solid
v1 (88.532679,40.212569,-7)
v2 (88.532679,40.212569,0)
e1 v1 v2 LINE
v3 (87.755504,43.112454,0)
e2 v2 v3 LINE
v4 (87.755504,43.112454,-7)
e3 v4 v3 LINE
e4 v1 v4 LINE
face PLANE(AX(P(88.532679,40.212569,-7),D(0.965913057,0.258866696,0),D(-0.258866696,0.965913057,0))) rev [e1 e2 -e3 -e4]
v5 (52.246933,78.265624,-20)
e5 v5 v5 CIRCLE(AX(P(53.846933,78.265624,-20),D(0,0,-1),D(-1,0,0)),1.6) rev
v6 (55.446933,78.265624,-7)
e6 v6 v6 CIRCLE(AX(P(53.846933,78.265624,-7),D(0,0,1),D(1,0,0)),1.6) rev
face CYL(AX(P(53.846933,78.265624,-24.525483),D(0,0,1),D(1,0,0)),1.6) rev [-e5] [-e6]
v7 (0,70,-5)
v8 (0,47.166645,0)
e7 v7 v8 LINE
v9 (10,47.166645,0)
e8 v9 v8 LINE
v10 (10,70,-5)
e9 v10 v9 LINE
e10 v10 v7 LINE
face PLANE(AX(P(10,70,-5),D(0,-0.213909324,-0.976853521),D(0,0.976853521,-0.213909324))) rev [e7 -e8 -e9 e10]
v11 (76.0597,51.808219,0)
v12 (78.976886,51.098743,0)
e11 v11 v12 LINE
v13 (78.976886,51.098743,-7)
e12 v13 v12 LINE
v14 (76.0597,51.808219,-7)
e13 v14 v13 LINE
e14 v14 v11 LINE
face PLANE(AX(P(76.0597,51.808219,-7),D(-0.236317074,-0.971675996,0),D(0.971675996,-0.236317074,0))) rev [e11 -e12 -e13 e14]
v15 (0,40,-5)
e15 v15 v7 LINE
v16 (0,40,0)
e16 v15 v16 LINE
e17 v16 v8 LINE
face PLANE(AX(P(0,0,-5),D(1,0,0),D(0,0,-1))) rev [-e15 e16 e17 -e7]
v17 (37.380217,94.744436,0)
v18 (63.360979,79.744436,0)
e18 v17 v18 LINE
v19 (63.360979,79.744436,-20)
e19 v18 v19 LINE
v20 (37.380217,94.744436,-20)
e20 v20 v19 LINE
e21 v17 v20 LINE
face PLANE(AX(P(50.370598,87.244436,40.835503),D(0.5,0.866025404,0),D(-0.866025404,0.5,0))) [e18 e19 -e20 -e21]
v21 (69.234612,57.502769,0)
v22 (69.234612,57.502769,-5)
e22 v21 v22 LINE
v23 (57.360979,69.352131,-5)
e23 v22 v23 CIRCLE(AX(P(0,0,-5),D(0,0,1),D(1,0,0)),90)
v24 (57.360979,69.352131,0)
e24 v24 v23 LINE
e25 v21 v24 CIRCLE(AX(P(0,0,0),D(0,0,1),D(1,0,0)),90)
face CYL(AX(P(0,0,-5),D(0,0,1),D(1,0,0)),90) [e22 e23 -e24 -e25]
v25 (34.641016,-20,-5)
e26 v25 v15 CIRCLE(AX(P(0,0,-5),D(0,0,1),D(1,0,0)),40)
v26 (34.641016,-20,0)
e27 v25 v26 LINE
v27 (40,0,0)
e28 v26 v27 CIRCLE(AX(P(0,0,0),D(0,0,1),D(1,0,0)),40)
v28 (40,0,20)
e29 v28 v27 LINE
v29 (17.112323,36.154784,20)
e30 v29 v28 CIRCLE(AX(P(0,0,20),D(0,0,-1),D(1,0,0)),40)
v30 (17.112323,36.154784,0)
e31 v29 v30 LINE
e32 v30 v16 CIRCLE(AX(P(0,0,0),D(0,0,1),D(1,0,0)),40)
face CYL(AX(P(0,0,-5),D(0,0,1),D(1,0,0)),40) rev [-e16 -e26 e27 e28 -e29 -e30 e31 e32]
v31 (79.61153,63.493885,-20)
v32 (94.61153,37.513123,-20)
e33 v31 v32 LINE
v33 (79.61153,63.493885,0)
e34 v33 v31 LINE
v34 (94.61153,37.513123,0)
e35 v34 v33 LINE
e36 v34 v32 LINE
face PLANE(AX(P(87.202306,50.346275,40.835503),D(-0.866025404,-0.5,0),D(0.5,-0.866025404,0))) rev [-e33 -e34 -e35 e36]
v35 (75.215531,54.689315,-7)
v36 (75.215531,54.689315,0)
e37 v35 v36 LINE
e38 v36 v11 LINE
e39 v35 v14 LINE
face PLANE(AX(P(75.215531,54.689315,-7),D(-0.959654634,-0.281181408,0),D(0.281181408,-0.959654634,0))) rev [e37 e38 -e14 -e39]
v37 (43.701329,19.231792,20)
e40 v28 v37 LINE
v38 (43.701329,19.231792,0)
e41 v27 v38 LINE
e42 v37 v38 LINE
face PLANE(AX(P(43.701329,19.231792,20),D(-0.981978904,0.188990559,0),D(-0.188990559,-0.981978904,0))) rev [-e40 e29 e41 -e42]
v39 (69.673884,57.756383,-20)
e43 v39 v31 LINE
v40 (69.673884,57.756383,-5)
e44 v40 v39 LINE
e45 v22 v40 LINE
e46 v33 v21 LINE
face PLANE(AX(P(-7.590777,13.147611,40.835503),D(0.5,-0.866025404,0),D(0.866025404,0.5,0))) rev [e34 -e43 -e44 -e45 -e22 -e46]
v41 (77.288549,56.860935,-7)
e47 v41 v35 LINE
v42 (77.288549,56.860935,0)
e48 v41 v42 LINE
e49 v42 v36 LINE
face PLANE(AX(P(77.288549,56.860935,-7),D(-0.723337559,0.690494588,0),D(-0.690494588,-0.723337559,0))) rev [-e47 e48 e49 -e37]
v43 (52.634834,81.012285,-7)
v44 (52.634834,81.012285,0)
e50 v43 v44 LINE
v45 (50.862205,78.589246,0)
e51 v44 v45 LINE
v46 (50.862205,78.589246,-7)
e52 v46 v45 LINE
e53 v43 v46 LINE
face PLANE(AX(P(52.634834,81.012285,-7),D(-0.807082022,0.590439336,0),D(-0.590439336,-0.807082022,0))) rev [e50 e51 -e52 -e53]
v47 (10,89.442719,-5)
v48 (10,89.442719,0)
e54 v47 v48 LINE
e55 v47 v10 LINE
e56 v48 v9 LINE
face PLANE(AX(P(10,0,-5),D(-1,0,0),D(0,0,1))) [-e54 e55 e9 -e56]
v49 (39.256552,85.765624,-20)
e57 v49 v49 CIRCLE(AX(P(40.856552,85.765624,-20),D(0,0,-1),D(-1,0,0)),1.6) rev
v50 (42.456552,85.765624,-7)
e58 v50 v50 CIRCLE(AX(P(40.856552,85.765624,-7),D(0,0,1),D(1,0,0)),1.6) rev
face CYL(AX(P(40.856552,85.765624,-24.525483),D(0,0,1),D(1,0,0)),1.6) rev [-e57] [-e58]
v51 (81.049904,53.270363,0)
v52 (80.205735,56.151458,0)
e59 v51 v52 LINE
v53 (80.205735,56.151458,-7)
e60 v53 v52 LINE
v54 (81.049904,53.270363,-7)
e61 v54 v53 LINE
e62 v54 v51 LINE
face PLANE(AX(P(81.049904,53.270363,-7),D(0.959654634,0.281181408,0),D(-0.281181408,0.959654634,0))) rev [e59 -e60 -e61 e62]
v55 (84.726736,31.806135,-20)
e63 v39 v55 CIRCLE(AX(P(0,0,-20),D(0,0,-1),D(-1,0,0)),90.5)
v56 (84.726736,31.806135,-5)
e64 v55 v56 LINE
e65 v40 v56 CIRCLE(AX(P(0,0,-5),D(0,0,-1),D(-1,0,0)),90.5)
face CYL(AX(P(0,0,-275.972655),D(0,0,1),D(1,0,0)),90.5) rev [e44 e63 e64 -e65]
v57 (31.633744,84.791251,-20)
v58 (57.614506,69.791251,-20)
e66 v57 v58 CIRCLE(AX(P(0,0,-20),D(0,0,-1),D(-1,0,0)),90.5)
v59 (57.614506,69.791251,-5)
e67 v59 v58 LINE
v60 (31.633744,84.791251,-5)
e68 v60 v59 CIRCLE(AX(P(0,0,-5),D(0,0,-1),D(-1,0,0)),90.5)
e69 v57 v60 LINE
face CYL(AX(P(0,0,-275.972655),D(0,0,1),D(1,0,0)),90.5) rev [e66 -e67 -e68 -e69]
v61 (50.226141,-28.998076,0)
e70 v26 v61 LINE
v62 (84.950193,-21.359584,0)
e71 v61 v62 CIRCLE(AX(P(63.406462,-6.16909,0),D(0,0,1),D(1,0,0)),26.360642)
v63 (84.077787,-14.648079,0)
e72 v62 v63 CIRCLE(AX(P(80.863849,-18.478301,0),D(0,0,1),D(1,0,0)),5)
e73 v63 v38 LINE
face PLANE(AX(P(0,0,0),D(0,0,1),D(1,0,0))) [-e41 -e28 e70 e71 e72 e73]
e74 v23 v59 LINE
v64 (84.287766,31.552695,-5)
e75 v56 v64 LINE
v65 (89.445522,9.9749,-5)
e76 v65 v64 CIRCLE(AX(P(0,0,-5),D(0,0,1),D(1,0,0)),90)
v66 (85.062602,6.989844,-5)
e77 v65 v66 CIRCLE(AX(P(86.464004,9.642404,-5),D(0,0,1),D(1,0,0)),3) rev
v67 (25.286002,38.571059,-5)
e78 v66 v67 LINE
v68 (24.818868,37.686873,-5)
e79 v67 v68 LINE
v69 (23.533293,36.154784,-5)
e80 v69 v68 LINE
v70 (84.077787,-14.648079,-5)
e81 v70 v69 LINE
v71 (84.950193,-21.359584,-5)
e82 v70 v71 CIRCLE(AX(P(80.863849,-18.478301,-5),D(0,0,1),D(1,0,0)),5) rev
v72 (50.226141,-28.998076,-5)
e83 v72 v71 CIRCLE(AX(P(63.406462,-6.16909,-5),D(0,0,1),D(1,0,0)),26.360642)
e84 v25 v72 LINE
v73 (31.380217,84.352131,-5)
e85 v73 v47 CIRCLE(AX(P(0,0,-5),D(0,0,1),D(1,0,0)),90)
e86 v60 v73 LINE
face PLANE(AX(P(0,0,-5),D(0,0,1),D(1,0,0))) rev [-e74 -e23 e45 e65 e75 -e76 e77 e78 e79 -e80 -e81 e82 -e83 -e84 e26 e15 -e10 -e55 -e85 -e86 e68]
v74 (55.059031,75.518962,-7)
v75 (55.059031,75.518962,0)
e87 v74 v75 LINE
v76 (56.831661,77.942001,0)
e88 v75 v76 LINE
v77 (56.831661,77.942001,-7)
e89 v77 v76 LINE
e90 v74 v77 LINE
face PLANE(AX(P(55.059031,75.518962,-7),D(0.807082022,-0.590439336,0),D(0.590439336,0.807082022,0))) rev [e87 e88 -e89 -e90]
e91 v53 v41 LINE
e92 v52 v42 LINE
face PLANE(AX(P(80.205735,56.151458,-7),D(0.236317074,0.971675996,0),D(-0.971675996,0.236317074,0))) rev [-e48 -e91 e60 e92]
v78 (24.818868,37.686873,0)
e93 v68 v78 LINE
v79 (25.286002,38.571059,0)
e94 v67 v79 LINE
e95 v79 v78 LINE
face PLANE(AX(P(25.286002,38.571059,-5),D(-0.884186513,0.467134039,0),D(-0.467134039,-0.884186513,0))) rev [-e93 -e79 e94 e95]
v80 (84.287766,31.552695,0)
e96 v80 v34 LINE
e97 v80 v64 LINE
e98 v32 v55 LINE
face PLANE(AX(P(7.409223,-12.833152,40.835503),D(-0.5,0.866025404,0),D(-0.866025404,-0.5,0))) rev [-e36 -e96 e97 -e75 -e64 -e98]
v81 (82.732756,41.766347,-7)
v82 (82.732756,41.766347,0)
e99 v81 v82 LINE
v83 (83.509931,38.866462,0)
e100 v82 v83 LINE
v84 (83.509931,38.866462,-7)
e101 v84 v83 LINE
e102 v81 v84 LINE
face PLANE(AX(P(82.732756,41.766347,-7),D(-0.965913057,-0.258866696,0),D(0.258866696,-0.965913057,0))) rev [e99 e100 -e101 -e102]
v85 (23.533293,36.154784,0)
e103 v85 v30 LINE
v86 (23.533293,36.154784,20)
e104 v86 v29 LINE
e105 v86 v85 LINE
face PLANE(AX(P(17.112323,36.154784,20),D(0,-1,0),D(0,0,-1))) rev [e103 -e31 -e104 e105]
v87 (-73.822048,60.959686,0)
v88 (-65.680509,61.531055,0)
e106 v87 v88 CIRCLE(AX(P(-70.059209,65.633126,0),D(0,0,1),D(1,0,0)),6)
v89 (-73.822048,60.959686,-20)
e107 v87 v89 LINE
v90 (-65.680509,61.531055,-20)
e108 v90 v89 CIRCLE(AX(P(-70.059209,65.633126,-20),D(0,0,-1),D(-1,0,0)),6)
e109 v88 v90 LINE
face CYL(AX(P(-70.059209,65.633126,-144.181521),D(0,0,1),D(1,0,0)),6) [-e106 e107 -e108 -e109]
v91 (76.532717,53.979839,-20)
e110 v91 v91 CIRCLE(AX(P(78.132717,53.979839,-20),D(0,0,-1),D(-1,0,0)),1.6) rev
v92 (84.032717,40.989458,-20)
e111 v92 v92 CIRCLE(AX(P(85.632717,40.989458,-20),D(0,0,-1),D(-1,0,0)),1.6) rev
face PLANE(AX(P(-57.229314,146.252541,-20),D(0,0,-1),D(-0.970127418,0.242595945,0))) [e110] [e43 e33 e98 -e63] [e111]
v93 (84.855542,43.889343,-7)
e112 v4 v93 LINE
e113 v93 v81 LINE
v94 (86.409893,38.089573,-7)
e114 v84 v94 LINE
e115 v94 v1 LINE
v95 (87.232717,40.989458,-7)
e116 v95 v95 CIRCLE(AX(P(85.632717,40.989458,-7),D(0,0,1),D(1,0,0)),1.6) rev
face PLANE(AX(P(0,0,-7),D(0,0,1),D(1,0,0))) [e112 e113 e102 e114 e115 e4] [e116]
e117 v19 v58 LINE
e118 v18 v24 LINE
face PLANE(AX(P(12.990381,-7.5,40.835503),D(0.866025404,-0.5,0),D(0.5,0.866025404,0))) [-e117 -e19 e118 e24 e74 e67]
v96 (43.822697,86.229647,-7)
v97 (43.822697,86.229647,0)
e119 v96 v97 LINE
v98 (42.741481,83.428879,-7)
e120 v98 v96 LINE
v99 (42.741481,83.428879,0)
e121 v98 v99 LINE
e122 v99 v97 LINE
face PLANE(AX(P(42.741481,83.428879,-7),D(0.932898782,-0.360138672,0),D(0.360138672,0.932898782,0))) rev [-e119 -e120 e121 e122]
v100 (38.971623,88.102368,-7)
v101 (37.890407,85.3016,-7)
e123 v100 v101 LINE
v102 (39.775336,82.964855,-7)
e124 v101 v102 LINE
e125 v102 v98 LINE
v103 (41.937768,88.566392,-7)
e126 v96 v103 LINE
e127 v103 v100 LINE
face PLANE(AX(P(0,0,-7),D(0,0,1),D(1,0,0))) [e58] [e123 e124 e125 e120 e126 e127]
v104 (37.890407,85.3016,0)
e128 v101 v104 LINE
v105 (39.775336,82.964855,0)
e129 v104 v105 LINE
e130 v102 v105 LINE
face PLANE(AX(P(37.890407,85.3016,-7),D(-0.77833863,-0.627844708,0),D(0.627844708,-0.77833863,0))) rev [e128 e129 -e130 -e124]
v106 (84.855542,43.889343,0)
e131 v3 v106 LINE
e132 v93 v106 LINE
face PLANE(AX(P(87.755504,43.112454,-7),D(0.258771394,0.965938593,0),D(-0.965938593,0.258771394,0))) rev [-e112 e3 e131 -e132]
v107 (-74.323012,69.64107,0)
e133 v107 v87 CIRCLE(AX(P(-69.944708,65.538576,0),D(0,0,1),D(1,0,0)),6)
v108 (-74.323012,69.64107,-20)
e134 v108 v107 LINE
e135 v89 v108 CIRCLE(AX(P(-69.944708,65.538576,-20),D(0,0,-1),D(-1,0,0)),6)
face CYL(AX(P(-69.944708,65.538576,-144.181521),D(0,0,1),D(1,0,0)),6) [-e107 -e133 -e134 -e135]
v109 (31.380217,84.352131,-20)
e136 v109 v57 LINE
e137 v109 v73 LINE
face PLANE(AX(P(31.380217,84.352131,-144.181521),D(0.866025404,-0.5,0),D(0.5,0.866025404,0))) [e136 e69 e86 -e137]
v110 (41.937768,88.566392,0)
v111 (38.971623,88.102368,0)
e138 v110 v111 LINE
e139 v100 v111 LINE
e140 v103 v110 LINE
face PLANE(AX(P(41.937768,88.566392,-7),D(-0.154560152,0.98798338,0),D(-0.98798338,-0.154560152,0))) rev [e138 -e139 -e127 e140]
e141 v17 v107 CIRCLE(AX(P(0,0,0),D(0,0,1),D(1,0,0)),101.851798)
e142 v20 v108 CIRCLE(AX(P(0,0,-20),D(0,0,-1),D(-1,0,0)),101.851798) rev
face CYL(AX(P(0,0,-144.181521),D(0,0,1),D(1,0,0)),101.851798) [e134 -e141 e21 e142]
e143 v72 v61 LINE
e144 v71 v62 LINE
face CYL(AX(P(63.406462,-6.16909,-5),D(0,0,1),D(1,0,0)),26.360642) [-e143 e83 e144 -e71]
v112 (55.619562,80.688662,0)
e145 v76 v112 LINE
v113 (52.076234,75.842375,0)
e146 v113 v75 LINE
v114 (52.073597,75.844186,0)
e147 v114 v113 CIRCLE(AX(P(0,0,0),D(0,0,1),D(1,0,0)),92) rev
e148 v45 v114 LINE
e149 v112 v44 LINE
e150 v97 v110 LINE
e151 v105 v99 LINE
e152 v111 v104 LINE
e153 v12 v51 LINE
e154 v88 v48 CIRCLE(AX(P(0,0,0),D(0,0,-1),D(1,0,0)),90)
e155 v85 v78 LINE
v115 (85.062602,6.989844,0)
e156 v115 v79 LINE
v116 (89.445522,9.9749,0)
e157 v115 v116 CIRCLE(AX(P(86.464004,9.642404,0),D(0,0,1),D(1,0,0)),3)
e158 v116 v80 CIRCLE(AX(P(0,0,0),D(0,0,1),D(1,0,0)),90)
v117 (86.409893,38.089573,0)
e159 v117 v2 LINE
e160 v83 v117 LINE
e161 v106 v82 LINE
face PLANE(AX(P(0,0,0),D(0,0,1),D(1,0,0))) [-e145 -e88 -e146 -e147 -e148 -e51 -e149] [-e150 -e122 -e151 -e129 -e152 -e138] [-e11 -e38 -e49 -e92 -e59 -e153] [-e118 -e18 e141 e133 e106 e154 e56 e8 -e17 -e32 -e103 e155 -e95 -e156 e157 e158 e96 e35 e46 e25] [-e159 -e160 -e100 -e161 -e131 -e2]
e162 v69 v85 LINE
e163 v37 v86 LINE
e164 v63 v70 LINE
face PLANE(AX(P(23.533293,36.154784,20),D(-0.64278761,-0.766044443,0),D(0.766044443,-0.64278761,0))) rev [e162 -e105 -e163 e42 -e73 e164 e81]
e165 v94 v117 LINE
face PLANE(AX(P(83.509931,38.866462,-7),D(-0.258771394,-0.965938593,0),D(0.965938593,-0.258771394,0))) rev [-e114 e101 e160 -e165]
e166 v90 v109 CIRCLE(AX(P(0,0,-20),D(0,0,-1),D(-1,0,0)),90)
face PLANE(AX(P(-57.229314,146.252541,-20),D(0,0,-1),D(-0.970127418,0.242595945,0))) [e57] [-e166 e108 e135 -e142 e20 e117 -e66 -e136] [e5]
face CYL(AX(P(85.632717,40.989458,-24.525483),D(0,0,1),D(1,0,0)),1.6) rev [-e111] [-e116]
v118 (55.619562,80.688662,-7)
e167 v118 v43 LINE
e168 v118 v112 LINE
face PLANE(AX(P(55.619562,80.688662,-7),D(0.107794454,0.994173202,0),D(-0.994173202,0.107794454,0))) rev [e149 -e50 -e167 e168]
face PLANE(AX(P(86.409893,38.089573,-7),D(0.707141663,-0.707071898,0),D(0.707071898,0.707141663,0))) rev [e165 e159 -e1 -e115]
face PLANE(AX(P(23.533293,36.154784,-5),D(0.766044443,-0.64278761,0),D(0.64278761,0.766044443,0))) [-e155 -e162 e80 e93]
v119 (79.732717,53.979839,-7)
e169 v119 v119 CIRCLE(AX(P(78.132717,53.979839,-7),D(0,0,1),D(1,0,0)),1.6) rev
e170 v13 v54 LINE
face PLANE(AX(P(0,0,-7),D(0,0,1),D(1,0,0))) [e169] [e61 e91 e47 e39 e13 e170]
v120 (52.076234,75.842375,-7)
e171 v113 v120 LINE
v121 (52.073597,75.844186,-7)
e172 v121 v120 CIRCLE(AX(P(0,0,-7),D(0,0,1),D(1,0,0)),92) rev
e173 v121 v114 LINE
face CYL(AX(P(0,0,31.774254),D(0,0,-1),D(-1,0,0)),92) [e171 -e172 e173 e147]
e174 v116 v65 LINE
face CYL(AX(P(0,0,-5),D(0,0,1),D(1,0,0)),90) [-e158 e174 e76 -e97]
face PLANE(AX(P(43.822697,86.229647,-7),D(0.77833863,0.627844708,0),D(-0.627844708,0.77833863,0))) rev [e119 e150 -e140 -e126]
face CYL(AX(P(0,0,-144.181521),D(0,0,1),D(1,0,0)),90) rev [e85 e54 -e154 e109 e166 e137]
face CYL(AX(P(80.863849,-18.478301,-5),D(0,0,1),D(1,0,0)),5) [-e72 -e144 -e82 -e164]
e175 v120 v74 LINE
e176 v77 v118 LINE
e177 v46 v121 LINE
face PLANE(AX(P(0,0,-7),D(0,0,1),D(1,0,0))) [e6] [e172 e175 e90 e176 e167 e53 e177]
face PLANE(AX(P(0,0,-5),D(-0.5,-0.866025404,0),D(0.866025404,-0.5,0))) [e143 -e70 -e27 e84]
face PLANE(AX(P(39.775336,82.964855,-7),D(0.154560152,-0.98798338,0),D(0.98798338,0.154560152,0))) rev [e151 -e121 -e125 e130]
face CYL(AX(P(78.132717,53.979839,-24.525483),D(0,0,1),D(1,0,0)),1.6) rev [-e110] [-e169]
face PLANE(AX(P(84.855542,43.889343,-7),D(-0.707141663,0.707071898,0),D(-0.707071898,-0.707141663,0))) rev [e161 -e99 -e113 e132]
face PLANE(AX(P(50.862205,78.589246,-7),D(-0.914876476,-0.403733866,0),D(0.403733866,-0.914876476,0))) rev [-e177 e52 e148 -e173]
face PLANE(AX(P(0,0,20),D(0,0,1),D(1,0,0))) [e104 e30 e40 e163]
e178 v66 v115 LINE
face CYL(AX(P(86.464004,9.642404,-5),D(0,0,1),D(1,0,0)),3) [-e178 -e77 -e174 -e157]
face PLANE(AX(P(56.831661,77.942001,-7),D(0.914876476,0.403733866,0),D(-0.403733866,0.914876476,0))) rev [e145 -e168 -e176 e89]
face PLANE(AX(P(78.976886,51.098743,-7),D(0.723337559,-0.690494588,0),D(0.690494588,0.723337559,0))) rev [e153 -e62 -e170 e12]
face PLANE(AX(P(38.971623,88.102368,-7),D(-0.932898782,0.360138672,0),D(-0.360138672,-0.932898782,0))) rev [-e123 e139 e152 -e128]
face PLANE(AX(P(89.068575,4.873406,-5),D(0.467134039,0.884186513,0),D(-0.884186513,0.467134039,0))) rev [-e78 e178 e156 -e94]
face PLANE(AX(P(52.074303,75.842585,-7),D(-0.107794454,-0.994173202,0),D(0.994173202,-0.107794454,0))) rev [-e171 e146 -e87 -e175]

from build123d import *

# Parameters (mm, degrees)
BOSS_EXTRUDE1_DEPTH  = 5
CUT_EXTRUDE1_DEPTH   = 10
BOSS_EXTRUDE3_START  = -3
SKETCH13_R           = 2.5
BOSS_EXTRUDE3_DEPTH  = 3
CHAMFER1_SIZE        = 2
BOSS_EXTRUDE7_DEPTH  = 17
SKETCH22_R           = 1.6
CUT_EXTRUDE4_DEPTH   = 20
CUT_EXTRUDE5_DEPTH   = 7
BOSS_EXTRUDE8_START  = -20
BOSS_EXTRUDE8_DEPTH  = 20
SKETCH26_R           = 90.5
SKETCH26_R_2         = 90
CUT_EXTRUDE6_DEPTH   = 15
BOSS_EXTRUDE9_START  = 20
BOSS_EXTRUDE9_DEPTH  = 20
BOSS_EXTRUDE11_DEPTH = 20
FILLET2_R            = 6
CUT_EXTRUDE8_DEPTH   = 5
FILLET3_R            = 5
CUT_EXTRUDE9_DEPTH   = 5
FILLET4_R            = 3
CUT_EXTRUDE11_DEPTH  = 5
FILLET5_R            = 3


# Some blends are built 0.0001 mm under size
with BuildPart() as part:
    # Sketch1 → Boss-Extrude1 (new body)
    with BuildSketch(Plane.XY):
        with BuildLine():
            Line((10, 70), (0, 70))
            Line((0, 70), (0, 40))
            ThreePointArc((0, 40), (34.641016151, 20), (34.641016151, -20))
            Line((34.641016151, -20), (50.226140717, -28.998075863))
            ThreePointArc((50.226140717, -28.998075863), (74.464134482, -30.098388714), (89.334294573, -10.926290001))
            ThreePointArc((89.334294573, -10.926290001), (70.606727842, 55.809407661), (10, 89.4427191))
            Line((10, 89.4427191), (10, 70))
        make_face()
    extrude(amount=-BOSS_EXTRUDE1_DEPTH)

    # Sketch10 → Cut-Extrude1 (cut)
    with BuildSketch(Plane.ZY):
        Polygon((-5, 70), (0, 47.166644618), (0, 70), align=None)
    extrude(amount=-CUT_EXTRUDE1_DEPTH, mode=Mode.SUBTRACT)

    # Sketch13 → Boss-Extrude3 (add)
    # profile 1 of 2: a face of its own
    with BuildSketch(Plane.XY.offset(BOSS_EXTRUDE3_START)):
        with BuildLine():
            Line((37.380217316, 94.74443559), (31.380217316, 84.352130745))
            ThreePointArc((31.380217316, 84.352130745), (45, 77.942286341), (57.36097943, 69.352130745))
            Line((57.36097943, 69.352130745), (63.36097943, 79.74443559))
            Line((63.36097943, 79.74443559), (37.380217316, 94.74443559))
        make_face()
        with Locations((40.856551784, 85.765623512)):
            Circle(SKETCH13_R, mode=Mode.SUBTRACT)
        with Locations((53.846932841, 78.265623512)):
            Circle(SKETCH13_R, mode=Mode.SUBTRACT)
    # profile 2 of 2: a face of its own
    with BuildSketch(Plane.XY.offset(BOSS_EXTRUDE3_START)):
        with BuildLine():
            Line((79.611529559, 63.493885461), (69.234612109, 57.502769378))
            ThreePointArc((69.234612109, 57.502769378), (77.850059036, 45.159365674), (84.287765503, 31.552695391))
            Line((84.287765503, 31.552695391), (94.611529559, 37.513123348))
            Line((94.611529559, 37.513123348), (79.611529559, 63.493885461))
        make_face()
        with Locations((85.63271748, 40.989457815)):
            Circle(SKETCH13_R, mode=Mode.SUBTRACT)
        with Locations((78.13271748, 53.979838872)):
            Circle(SKETCH13_R, mode=Mode.SUBTRACT)
    extrude(amount=BOSS_EXTRUDE3_DEPTH)

    # Chamfer1
    chamfer1_edges = [part.edges().sort_by_distance(p)[0] for p in [
        (45, 77.942286341, -3),
    ]]
    chamfer(chamfer1_edges, length=CHAMFER1_SIZE - 0.0001)  # a hair under: the kernel refuses the full size

    # Sketch21 → Boss-Extrude7 (add)
    with BuildSketch(Plane(origin=(0, 0, -3), x_dir=(-1, 0, 0), z_dir=(0, 0, -1))):
        with BuildLine():
            Line((-32.394087652, 86.108205679), (-37.380217316, 94.74443559))
            Line((-37.380217316, 94.74443559), (-63.36097943, 79.74443559))
            Line((-63.36097943, 79.74443559), (-58.374849766, 71.108205679))
            ThreePointArc((-58.374849766, 71.108205679), (-46, 79.674337148), (-32.394087652, 86.108205679))
        make_face()
        with BuildLine():
            Line((-86.043250616, 32.566225194), (-94.611529559, 37.513123348))
            Line((-94.611529559, 37.513123348), (-79.611529559, 63.493885461))
            Line((-79.611529559, 63.493885461), (-70.991284652, 58.516984744))
            ThreePointArc((-70.991284652, 58.516984744), (-79.582170095, 46.159269957), (-86.043250616, 32.566225194))
        make_face()
    extrude(amount=BOSS_EXTRUDE7_DEPTH)

    # Sketch22 → Cut-Extrude4 (cut)
    with BuildSketch(Plane.XY):
        with Locations(Location((40.856551784, 85.765623512, 0), (0, 0, 180))):
            Circle(SKETCH22_R)
        with Locations(Location((53.846932841, 78.265623512, 0), (0, 0, 180))):
            Circle(SKETCH22_R)
        with Locations(Location((78.13271748, 53.979838872, 0), (0, 0, 180))):
            Circle(SKETCH22_R)
        with Locations(Location((85.63271748, 40.989457815, 0), (0, 0, 180))):
            Circle(SKETCH22_R)
    extrude(amount=-CUT_EXTRUDE4_DEPTH, mode=Mode.SUBTRACT)

    # Sketch24 → Cut-Extrude5 (cut)
    with BuildSketch(Plane.XY):
        Polygon((42.741480602, 83.428878621), (43.82269663, 86.229647308), (41.937767812, 88.566392198), (38.971622965, 88.102368402), (37.890406937, 85.301599716), (39.775335756, 82.964854825), align=None)
        Polygon((55.059031292, 75.518961778), (56.831660903, 77.942000695), (55.619562452, 80.688662429), (52.634834389, 81.012285245), (50.862204778, 78.589246328), (52.074303229, 75.842584594), align=None)
        Polygon((78.97688632, 51.098743194), (81.049903948, 53.270362694), (80.205735108, 56.151458371), (77.28854864, 56.860934549), (75.215531013, 54.68931505), (76.059699853, 51.808219373), align=None)
        Polygon((86.409892613, 38.089572965), (88.532678995, 40.212568798), (87.755503862, 43.112453649), (84.855542347, 43.889342666), (82.732755965, 41.766346832), (83.509931098, 38.866461981), align=None)
    extrude(amount=-CUT_EXTRUDE5_DEPTH, mode=Mode.SUBTRACT)

    # Sketch25 → Boss-Extrude8 (add)
    with BuildSketch(Plane(origin=(0, 0, -20), x_dir=(-1, 0, 0), z_dir=(0, 0, -1)).offset(BOSS_EXTRUDE8_START)):
        with BuildLine():
            Line((-86.043250616, 32.566225194), (-84.287765503, 31.552695391))
            ThreePointArc((-84.287765503, 31.552695391), (-77.850059036, 45.159365674), (-69.234612109, 57.502769378))
            Line((-69.234612109, 57.502769378), (-70.991284652, 58.516984744))
            ThreePointArc((-70.991284652, 58.516984744), (-79.582170095, 46.159269957), (-86.043250616, 32.566225194))
        make_face()
        with BuildLine():
            Line((-58.374849766, 71.108205679), (-57.36097943, 69.352130745))
            ThreePointArc((-57.36097943, 69.352130745), (-45, 77.942286341), (-31.380217316, 84.352130745))
            Line((-31.380217316, 84.352130745), (-32.394087652, 86.108205679))
            ThreePointArc((-32.394087652, 86.108205679), (-46, 79.674337148), (-58.374849766, 71.108205679))
        make_face()
    extrude(amount=BOSS_EXTRUDE8_DEPTH)

    # Sketch26 → Cut-Extrude6 (cut)
    with BuildSketch(Plane(origin=(0, 0, -5), x_dir=(-1, 0, 0), z_dir=(0, 0, -1))):
        Circle(SKETCH26_R)
        Circle(SKETCH26_R_2, mode=Mode.SUBTRACT)
    extrude(amount=CUT_EXTRUDE6_DEPTH, mode=Mode.SUBTRACT)

    # Sketch28 → Boss-Extrude9 (add)
    with BuildSketch(Plane.XY.offset(BOSS_EXTRUDE9_START)):
        with BuildLine():
            Line((23.533293218, 36.154783936), (43.701329204, 19.231792379))
            Line((43.701329204, 19.231792379), (40, 0))
            ThreePointArc((40, 0), (33.797136862, 21.395175623), (17.112323002, 36.154783936))
            Line((17.112323002, 36.154783936), (23.533293218, 36.154783936))
        make_face()
    extrude(amount=-BOSS_EXTRUDE9_DEPTH)

    # Sketch30 → Boss-Extrude11 (add)
    with BuildSketch(Plane.XY):
        with BuildLine():
            Line((31.380217316, 84.352130745), (37.380217316, 94.74443559))
            ThreePointArc((37.380217316, 94.74443559), (-25.433217284, 98.625251232), (-78.536554117, 64.8521271))
            Line((-78.536554117, 64.8521271), (-69.397791898, 57.305728157))
            ThreePointArc((-69.397791898, 57.305728157), (-23.328329719, 86.92404174), (31.380217316, 84.352130745))
        make_face()
    extrude(amount=-BOSS_EXTRUDE11_DEPTH)

    # Fillet2
    # the kernel refuses this fillet: 6 mm, written as the material it takes off along each edge
    with BuildSketch(Plane(origin=(-69.397791898, 57.305728157, 14.53079134), x_dir=(0.6605272706079757, 0.7508020543280219, 0), z_dir=(0, 0, -1))) as fillet2_piece_1:
        with BuildLine():
            CenterArc((5.815342996, -5.997066729), FILLET2_R, 91.791660849, 86.416678302)
            Line((-0.181723733, -5.809475019), (0, 0))
            ThreePointArc((0, 0), (2.813875643, -0.043999067), (5.627751287, 0))
        make_face()
    extrude(amount=49.06158268, mode=Mode.SUBTRACT)
    with BuildSketch(Plane(origin=(-78.536554117, 64.8521271, 15.946769714), x_dir=(0.6605636178718797, 0.7507700758181651, 0), z_dir=(0, 0, -1))) as fillet2_piece_2:
        with BuildLine():
            CenterArc((6.190825845, 5.99705764), FILLET2_R, 178.205565332, 93.588869337)
            Line((0.193768204, 6.184939681), (0, 0))
            ThreePointArc((0, 0), (3.189353943, -0.049947441), (6.378707886, 0))
        make_face()
    extrude(amount=51.893539428, mode=Mode.SUBTRACT)

    # Sketch31 → Cut-Extrude8 (cut)
    with BuildSketch(Plane(origin=(0, 0, 0), x_dir=(-1, 0, 0), z_dir=(0, 0, -1))):
        Polygon((-126.538851056, -27.990413584), (-128.420531953, -25.747913615), (-227.900156191, -109.221229623), (-215.044403998, -124.542118485), (-23.533293218, 36.154783936), (-24.818868437, 37.686872822), (-88.130475533, 4.238040152), align=None)
    extrude(amount=CUT_EXTRUDE8_DEPTH, mode=Mode.SUBTRACT)

    # Fillet3
    fillet3_edges = [part.edges().sort_by_distance(p)[0] for p in [
        (87.283893388, -17.338321154, -2.5),
    ]]
    fillet(fillet3_edges, radius=FILLET3_R)

    # Sketch32 → Cut-Extrude9 (cut)
    with BuildSketch(Plane.XY):
        Polygon((87.46553992, 4.589339402), (92.809930085, 1.765787441), (89.670227424, 2.292669877), align=None)
    extrude(amount=-CUT_EXTRUDE9_DEPTH, mode=Mode.SUBTRACT)

    # Fillet4
    fillet4_edges = [part.edges().sort_by_distance(p)[0] for p in [
        (89.94013986, 3.281957025, -2.5),
    ]]
    fillet(fillet4_edges, radius=FILLET4_R)

    # Sketch33 → Cut-Extrude11 (cut)
    with BuildSketch(Plane.XY):
        Polygon((24.818868437, 37.686872822), (88.601440511, 3.989219605), (89.06857455, 4.873406118), (25.286002476, 38.571059335), align=None)
    extrude(amount=-CUT_EXTRUDE11_DEPTH, mode=Mode.SUBTRACT)

    # Fillet5
    # the kernel refuses this fillet: 3 mm, written as the material it takes off along each edge
    with BuildSketch(Plane(origin=(87.631958407, 5.632400166, -16.76496935), x_dir=(0.385373580220951, 0.9227606426737577, 0), z_dir=(0, 0, 1))) as fillet5_piece_1:
        with BuildLine():
            CenterArc((3.250174857, 2.623091468), FILLET5_R, 174.818513503, 124.211713056)
            Line((0.262433961, 2.894023819), (-0.036340129, 2.921117054))
            Line((-0.036340129, 2.921117054), (-0.29877409, 0.027093235))
            Line((-0.29877409, 0.027093235), (-0.219376832, -0.204630901))
            ThreePointArc((-0.219376832, -0.204630901), (3.755091894, -0.860969557), (4.851569028, -0.262309147))
            Line((4.851569028, -0.262309147), (4.70598774, 0))
        make_face()
    extrude(amount=28.529938699, mode=Mode.SUBTRACT)


solid = part.part
